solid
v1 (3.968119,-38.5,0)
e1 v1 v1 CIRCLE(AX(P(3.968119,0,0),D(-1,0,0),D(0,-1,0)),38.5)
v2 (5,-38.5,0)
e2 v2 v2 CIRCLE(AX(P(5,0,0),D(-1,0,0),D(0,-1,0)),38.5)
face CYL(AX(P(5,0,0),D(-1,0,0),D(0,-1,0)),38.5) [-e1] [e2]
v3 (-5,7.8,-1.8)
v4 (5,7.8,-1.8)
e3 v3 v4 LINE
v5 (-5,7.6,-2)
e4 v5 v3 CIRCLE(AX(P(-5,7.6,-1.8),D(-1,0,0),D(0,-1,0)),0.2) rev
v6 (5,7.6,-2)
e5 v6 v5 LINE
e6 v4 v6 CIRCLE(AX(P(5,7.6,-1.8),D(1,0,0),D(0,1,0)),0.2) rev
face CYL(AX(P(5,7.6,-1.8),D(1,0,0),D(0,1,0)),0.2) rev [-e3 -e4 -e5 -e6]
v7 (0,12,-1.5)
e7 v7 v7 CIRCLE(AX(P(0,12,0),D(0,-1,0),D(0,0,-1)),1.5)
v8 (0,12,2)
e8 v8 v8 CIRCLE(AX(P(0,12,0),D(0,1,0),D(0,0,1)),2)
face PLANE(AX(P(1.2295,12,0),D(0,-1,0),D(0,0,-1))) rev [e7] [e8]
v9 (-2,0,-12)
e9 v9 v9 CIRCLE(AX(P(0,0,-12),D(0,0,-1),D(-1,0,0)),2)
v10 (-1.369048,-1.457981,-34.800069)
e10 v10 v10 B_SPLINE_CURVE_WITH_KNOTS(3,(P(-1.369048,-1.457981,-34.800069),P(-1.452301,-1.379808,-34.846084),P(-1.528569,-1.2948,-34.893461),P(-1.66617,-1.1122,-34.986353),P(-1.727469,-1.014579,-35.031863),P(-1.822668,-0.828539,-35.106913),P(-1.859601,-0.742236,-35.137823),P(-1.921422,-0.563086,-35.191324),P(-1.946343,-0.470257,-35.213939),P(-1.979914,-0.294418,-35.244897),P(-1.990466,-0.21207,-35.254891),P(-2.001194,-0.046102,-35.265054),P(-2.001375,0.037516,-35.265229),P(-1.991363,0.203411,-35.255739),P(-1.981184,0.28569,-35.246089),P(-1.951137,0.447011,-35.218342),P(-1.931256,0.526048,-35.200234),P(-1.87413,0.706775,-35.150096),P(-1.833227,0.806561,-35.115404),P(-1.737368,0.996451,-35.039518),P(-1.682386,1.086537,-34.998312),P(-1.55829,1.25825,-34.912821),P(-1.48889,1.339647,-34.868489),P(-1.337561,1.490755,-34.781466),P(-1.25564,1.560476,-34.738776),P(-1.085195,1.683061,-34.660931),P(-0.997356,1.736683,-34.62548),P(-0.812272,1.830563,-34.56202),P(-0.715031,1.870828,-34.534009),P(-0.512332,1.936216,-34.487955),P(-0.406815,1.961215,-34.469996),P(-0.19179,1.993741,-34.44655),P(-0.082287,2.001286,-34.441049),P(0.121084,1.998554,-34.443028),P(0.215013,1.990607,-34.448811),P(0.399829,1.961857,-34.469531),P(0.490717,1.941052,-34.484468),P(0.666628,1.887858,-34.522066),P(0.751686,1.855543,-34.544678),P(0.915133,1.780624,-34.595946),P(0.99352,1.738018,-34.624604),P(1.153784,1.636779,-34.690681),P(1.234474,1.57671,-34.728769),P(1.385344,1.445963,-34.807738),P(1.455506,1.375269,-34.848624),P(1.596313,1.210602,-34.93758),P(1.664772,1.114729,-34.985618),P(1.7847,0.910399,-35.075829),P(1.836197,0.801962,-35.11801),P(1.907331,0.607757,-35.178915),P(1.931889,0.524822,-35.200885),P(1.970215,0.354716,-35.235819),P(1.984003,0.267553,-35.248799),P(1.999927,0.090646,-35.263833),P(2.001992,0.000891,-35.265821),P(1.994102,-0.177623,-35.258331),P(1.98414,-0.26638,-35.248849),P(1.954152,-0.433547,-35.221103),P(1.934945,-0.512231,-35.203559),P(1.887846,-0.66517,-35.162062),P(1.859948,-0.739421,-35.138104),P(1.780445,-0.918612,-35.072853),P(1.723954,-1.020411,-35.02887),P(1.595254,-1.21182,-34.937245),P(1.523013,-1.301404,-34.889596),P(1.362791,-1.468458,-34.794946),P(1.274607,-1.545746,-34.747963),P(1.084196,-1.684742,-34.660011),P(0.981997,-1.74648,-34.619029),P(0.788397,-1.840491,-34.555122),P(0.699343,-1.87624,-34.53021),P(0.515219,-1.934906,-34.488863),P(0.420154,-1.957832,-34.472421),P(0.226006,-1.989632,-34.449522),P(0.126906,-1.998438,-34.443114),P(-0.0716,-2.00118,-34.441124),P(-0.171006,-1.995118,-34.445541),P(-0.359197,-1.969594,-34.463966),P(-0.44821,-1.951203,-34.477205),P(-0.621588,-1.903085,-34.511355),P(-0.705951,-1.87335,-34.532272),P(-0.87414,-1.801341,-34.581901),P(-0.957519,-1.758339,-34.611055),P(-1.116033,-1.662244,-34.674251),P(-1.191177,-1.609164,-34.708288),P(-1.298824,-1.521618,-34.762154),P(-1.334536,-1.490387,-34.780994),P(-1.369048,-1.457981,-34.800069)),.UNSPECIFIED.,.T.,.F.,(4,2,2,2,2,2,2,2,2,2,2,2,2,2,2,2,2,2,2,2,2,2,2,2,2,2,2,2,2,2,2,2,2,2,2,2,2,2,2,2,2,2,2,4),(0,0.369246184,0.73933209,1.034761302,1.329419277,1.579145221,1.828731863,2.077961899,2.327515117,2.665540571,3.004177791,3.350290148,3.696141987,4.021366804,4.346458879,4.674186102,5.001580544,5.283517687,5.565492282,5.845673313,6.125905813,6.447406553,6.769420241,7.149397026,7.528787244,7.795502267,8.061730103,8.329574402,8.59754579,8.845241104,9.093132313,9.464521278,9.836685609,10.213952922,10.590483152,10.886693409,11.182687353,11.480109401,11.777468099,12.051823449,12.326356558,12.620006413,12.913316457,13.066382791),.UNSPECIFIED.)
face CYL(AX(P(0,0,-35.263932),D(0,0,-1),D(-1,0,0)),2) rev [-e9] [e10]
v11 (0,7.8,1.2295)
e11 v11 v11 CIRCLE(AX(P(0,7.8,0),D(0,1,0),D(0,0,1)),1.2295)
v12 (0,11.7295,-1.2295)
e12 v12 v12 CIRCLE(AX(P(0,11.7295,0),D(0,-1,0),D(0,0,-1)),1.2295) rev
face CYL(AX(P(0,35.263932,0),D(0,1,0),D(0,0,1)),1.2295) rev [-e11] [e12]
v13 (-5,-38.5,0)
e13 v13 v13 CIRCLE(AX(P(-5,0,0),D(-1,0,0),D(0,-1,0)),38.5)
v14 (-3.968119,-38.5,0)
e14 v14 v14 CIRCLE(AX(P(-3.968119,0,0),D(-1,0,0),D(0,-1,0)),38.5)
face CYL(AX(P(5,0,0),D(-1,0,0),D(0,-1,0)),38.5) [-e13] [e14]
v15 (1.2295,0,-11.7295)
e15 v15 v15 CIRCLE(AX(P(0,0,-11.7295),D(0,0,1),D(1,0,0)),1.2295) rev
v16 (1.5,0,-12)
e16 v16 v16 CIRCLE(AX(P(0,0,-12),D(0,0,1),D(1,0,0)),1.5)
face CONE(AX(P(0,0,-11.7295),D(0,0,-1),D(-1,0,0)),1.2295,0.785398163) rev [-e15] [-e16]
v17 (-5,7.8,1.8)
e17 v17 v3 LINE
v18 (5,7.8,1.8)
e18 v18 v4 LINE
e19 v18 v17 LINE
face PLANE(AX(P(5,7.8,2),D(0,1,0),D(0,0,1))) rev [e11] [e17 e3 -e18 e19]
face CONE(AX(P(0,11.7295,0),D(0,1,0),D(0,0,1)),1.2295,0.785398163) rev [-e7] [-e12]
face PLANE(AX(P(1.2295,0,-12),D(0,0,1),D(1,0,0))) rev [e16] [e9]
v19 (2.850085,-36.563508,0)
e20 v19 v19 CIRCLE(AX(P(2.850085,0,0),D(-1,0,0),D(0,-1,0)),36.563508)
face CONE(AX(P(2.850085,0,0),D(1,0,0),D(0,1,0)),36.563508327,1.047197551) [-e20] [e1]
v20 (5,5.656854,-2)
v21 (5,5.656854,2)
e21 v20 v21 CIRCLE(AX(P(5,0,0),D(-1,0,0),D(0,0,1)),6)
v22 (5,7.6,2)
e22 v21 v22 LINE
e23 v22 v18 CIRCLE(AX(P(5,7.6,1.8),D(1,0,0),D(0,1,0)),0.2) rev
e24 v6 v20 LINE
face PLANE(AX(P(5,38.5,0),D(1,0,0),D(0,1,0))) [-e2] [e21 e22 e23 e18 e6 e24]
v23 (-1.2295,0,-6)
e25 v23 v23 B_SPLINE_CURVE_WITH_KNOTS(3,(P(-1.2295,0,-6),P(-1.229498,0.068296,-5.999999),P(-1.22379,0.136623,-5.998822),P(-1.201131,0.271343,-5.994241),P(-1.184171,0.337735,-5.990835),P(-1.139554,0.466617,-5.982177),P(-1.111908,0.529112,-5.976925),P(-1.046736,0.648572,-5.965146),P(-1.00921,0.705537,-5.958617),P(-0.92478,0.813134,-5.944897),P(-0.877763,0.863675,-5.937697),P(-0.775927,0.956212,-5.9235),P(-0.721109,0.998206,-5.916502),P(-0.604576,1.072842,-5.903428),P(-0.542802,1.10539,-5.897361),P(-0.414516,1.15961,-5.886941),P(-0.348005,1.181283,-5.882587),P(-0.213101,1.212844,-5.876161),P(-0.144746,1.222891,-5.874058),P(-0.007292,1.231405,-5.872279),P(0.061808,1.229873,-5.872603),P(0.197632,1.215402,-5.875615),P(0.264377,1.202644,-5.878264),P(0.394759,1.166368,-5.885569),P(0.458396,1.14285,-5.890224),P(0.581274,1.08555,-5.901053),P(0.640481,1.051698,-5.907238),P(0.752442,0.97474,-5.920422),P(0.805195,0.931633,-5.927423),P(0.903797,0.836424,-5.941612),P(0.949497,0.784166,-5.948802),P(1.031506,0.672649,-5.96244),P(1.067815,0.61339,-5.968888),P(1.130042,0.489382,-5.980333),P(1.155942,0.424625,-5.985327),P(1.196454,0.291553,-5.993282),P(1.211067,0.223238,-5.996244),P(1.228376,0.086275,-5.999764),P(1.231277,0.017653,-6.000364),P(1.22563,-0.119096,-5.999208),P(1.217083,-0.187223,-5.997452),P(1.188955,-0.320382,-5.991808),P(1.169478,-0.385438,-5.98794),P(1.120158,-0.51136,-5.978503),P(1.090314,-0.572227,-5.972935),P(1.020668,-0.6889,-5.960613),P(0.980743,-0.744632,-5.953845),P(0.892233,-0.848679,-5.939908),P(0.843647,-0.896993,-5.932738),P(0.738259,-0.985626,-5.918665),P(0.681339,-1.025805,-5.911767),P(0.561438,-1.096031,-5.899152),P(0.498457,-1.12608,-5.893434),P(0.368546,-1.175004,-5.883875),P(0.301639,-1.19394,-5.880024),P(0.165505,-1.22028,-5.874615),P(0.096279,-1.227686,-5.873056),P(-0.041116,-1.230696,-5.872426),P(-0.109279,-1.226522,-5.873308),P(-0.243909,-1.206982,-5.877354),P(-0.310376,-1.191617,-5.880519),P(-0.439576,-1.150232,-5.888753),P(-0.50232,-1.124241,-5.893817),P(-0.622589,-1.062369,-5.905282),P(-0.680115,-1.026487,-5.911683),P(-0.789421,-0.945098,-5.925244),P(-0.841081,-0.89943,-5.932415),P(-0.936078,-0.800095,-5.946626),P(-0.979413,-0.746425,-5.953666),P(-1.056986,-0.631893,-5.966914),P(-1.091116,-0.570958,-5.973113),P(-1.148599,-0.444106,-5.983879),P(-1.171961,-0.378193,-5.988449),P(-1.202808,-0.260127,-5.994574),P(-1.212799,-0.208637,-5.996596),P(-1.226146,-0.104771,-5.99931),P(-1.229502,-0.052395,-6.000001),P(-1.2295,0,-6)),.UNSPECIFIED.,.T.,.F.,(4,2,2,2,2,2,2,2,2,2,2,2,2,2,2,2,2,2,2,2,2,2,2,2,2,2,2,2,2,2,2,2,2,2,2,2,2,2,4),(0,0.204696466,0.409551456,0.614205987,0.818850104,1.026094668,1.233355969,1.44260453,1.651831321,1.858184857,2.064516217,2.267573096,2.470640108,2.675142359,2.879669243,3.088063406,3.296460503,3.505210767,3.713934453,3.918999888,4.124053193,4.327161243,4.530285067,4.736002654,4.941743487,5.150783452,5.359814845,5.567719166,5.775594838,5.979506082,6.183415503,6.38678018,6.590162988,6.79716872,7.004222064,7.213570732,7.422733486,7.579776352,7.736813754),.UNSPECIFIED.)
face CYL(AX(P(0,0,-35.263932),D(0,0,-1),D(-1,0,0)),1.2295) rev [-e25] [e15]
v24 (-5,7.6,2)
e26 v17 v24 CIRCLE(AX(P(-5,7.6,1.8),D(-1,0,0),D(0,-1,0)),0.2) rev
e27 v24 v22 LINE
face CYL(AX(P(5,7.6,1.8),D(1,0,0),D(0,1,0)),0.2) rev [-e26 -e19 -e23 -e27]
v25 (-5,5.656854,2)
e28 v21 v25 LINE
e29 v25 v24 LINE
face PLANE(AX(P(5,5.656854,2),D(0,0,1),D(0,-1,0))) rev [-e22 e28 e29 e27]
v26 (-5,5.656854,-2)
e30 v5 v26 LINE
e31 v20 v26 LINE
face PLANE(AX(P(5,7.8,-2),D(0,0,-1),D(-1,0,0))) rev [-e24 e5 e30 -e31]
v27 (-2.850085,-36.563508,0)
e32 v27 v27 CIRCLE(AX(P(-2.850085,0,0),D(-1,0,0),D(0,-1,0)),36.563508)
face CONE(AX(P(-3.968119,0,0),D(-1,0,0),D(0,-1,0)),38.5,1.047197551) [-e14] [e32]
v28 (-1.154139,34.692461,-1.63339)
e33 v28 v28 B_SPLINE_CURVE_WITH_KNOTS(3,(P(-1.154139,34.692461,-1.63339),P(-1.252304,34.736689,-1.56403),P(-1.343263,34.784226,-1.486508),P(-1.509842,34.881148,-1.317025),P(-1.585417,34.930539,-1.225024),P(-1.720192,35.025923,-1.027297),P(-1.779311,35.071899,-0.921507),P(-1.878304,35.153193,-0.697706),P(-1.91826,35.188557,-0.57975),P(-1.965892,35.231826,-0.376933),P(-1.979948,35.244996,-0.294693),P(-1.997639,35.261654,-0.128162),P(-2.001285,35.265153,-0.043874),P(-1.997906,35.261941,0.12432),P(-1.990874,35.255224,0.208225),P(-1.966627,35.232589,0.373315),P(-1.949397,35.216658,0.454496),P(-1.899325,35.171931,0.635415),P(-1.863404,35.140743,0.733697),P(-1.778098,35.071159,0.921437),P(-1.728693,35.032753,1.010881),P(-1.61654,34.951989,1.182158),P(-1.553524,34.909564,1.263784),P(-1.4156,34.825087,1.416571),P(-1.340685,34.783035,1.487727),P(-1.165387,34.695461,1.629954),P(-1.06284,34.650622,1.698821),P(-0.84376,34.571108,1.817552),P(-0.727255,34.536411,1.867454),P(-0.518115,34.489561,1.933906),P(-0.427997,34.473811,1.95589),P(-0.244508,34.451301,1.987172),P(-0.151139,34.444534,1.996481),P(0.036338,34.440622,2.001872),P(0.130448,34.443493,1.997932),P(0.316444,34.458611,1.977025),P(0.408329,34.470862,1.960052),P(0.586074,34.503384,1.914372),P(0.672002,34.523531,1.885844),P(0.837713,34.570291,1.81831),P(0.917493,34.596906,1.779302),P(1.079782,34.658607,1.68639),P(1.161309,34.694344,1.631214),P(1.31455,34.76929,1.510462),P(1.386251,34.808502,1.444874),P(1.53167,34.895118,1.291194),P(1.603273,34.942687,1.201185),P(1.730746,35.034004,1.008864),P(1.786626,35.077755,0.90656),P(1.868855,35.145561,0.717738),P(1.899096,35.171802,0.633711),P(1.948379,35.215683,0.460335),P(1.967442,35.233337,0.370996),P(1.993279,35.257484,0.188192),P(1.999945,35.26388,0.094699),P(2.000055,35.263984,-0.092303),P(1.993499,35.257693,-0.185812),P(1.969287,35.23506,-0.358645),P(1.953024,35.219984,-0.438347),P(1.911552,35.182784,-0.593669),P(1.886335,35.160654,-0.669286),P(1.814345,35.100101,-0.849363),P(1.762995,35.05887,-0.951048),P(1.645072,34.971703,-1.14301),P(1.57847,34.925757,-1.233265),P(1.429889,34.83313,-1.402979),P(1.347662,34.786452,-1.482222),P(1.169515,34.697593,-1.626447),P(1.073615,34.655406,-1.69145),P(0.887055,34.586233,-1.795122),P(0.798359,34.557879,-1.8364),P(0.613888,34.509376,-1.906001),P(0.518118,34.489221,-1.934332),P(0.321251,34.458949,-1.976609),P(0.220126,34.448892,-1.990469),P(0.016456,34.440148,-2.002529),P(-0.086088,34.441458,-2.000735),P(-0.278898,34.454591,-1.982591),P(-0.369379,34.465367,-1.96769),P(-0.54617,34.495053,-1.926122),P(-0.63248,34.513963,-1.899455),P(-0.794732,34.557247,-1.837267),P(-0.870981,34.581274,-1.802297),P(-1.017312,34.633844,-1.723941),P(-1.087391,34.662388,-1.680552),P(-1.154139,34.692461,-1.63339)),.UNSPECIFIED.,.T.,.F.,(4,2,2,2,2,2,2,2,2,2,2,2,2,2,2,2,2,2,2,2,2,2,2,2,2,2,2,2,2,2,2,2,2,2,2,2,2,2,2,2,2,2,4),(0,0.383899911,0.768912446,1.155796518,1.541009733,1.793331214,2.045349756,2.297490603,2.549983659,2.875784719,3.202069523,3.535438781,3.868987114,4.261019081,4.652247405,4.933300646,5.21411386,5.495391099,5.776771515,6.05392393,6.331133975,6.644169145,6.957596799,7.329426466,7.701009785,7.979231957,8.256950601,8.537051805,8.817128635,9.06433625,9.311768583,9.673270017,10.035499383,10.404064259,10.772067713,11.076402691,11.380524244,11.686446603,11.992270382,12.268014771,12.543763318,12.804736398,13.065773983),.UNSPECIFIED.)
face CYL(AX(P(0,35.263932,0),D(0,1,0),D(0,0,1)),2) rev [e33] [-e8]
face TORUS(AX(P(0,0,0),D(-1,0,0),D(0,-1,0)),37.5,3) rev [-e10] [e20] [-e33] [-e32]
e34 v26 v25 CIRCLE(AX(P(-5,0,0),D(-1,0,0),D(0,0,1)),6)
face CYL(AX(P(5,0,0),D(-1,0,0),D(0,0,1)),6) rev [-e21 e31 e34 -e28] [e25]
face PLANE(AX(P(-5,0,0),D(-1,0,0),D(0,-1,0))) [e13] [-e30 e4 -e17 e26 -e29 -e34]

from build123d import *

# Parameters (mm, degrees)
CUT_EXTRUDE1_DEPTH                               = 56.357926262
SKETCH3_W                                        = 10
SKETCH3_H                                        = 6
CBORE_START                                      = -35.263917504
CBORE_FOR_M2_HEX_HEAD_MACHINE_SCREW1_OUT_R       = 2
CBORE_FOR_M2_HEX_HEAD_MACHINE_SCREW1_DEPTH       = 23.263917504
CBORE_START_2                                    = -12
CBORE_FOR_M2_HEX_HEAD_MACHINE_SCREW1_2_O_R       = 1.2295
CBORE_FOR_M2_HEX_HEAD_MACHINE_SCREW1_2_DEPTH     = 6.12732314
CBORE_FOR_M2_HEX_HEAD_MACHINE_SCREW2_D           = 2.459
CBORE_FOR_M2_HEX_HEAD_MACHINE_SCREW2_DEPTH       = 27.463932023
CBORE_FOR_M2_HEX_HEAD_MACHINE_SCREW2_CBORE_D     = 4
CBORE_FOR_M2_HEX_HEAD_MACHINE_SCREW2_CBORE_DEPTH = 23.263932023
CHAMFER1_SIZE                                    = 0.2705
FILLET1_R                                        = 0.2


# Read off the part's stored shape, not the designer's step: CBORE for M2 Hex Head Machine Screw1
with BuildPart() as part:
    # Sketch1 → Revolve1 (revolve)
    with BuildSketch(Plane(origin=(0, 0, 0), x_dir=(-1, 0, 0), z_dir=(0, 0, -1)), mode=Mode.PRIVATE) as revolve1_sk:
        with BuildLine():
            Line((-5, 38.5), (-5, 0))
            Line((-5, 0), (5, 0))
            Line((5, 0), (5, 38.5))
            Line((5, 38.5), (3.968118785, 38.5))
            Line((3.968118785, 38.5), (2.850084796, 36.563508327))
            ThreePointArc((2.850084796, 36.563508327), (0, 34.5), (-2.850084796, 36.563508327))
            Line((-2.850084796, 36.563508327), (-3.968118785, 38.5))
            Line((-3.968118785, 38.5), (-5, 38.5))
        make_face()
    revolve(revolve1_sk.sketch.rotate(Axis((5, 0, 0), (-1, 0, 0)), 180), axis=Axis((5, 0, 0), (-1, 0, 0)))

    # Sketch2 → Cut-Extrude1 (cut, through all)
    with BuildSketch(Plane.ZY.offset(5)):
        with BuildLine():
            Line((2, 5.656854249), (2, 7.8))
            Line((2, 7.8), (-2, 7.8))
            Line((-2, 7.8), (-2, 5.656854249))
            ThreePointArc((-2, 5.656854249), (0, 6), (2, 5.656854249))
        make_face()
    extrude(amount=-CUT_EXTRUDE1_DEPTH, mode=Mode.SUBTRACT)

    # Sketch3 → Cut-Revolve1 (revolve, cut)
    with BuildSketch(Plane(origin=(0, 0, 0), x_dir=(-1, 0, 0), z_dir=(0, 0, -1)), mode=Mode.PRIVATE) as cut_revolve1_sk:
        with Locations((0, 3)):
            Rectangle(SKETCH3_W, SKETCH3_H)
    revolve(cut_revolve1_sk.sketch.rotate(Axis((5, 0, 0), (-1, 0, 0)), 180), axis=Axis((5, 0, 0), (-1, 0, 0)), mode=Mode.SUBTRACT)

    # CBORE for M2 Hex Head Machine Screw1 out → CBORE for M2 Hex Head Machine Screw1 (cut)
    with BuildSketch(Plane.XY.offset(CBORE_START)):
        Circle(CBORE_FOR_M2_HEX_HEAD_MACHINE_SCREW1_OUT_R)
    extrude(amount=CBORE_FOR_M2_HEX_HEAD_MACHINE_SCREW1_DEPTH, mode=Mode.SUBTRACT)

    # CBORE for M2 Hex Head Machine Screw1 2 o → CBORE for M2 Hex Head Machine Screw1 2 (cut)
    with BuildSketch(Plane.XY.offset(CBORE_START_2)):
        Circle(CBORE_FOR_M2_HEX_HEAD_MACHINE_SCREW1_2_O_R)
    extrude(amount=CBORE_FOR_M2_HEX_HEAD_MACHINE_SCREW1_2_DEPTH, mode=Mode.SUBTRACT)

    # CBORE for M2 Hex Head Machine Screw2
    with Locations(Plane(origin=(0, 35.263932023, 0), x_dir=(1, 0, 0), z_dir=(0, 1, 0))):
        with Locations((0, 0)):
            CounterBoreHole(CBORE_FOR_M2_HEX_HEAD_MACHINE_SCREW2_D / 2, CBORE_FOR_M2_HEX_HEAD_MACHINE_SCREW2_CBORE_D / 2, CBORE_FOR_M2_HEX_HEAD_MACHINE_SCREW2_CBORE_DEPTH, depth=CBORE_FOR_M2_HEX_HEAD_MACHINE_SCREW2_DEPTH)

    # Chamfer1
    chamfer1_edges = [part.edges().sort_by_distance(p)[0] for p in [
        (-1.2295, 0, -12),
        (1.2295, 12, 0),
    ]]
    chamfer(chamfer1_edges, length=CHAMFER1_SIZE)

    # Fillet1
    fillet1_edges = [part.edges().sort_by_distance(p)[0] for p in [
        (0, 7.8, -2),
        (0, 7.8, 2),
    ]]
    fillet(fillet1_edges, radius=FILLET1_R)


solid = part.part
